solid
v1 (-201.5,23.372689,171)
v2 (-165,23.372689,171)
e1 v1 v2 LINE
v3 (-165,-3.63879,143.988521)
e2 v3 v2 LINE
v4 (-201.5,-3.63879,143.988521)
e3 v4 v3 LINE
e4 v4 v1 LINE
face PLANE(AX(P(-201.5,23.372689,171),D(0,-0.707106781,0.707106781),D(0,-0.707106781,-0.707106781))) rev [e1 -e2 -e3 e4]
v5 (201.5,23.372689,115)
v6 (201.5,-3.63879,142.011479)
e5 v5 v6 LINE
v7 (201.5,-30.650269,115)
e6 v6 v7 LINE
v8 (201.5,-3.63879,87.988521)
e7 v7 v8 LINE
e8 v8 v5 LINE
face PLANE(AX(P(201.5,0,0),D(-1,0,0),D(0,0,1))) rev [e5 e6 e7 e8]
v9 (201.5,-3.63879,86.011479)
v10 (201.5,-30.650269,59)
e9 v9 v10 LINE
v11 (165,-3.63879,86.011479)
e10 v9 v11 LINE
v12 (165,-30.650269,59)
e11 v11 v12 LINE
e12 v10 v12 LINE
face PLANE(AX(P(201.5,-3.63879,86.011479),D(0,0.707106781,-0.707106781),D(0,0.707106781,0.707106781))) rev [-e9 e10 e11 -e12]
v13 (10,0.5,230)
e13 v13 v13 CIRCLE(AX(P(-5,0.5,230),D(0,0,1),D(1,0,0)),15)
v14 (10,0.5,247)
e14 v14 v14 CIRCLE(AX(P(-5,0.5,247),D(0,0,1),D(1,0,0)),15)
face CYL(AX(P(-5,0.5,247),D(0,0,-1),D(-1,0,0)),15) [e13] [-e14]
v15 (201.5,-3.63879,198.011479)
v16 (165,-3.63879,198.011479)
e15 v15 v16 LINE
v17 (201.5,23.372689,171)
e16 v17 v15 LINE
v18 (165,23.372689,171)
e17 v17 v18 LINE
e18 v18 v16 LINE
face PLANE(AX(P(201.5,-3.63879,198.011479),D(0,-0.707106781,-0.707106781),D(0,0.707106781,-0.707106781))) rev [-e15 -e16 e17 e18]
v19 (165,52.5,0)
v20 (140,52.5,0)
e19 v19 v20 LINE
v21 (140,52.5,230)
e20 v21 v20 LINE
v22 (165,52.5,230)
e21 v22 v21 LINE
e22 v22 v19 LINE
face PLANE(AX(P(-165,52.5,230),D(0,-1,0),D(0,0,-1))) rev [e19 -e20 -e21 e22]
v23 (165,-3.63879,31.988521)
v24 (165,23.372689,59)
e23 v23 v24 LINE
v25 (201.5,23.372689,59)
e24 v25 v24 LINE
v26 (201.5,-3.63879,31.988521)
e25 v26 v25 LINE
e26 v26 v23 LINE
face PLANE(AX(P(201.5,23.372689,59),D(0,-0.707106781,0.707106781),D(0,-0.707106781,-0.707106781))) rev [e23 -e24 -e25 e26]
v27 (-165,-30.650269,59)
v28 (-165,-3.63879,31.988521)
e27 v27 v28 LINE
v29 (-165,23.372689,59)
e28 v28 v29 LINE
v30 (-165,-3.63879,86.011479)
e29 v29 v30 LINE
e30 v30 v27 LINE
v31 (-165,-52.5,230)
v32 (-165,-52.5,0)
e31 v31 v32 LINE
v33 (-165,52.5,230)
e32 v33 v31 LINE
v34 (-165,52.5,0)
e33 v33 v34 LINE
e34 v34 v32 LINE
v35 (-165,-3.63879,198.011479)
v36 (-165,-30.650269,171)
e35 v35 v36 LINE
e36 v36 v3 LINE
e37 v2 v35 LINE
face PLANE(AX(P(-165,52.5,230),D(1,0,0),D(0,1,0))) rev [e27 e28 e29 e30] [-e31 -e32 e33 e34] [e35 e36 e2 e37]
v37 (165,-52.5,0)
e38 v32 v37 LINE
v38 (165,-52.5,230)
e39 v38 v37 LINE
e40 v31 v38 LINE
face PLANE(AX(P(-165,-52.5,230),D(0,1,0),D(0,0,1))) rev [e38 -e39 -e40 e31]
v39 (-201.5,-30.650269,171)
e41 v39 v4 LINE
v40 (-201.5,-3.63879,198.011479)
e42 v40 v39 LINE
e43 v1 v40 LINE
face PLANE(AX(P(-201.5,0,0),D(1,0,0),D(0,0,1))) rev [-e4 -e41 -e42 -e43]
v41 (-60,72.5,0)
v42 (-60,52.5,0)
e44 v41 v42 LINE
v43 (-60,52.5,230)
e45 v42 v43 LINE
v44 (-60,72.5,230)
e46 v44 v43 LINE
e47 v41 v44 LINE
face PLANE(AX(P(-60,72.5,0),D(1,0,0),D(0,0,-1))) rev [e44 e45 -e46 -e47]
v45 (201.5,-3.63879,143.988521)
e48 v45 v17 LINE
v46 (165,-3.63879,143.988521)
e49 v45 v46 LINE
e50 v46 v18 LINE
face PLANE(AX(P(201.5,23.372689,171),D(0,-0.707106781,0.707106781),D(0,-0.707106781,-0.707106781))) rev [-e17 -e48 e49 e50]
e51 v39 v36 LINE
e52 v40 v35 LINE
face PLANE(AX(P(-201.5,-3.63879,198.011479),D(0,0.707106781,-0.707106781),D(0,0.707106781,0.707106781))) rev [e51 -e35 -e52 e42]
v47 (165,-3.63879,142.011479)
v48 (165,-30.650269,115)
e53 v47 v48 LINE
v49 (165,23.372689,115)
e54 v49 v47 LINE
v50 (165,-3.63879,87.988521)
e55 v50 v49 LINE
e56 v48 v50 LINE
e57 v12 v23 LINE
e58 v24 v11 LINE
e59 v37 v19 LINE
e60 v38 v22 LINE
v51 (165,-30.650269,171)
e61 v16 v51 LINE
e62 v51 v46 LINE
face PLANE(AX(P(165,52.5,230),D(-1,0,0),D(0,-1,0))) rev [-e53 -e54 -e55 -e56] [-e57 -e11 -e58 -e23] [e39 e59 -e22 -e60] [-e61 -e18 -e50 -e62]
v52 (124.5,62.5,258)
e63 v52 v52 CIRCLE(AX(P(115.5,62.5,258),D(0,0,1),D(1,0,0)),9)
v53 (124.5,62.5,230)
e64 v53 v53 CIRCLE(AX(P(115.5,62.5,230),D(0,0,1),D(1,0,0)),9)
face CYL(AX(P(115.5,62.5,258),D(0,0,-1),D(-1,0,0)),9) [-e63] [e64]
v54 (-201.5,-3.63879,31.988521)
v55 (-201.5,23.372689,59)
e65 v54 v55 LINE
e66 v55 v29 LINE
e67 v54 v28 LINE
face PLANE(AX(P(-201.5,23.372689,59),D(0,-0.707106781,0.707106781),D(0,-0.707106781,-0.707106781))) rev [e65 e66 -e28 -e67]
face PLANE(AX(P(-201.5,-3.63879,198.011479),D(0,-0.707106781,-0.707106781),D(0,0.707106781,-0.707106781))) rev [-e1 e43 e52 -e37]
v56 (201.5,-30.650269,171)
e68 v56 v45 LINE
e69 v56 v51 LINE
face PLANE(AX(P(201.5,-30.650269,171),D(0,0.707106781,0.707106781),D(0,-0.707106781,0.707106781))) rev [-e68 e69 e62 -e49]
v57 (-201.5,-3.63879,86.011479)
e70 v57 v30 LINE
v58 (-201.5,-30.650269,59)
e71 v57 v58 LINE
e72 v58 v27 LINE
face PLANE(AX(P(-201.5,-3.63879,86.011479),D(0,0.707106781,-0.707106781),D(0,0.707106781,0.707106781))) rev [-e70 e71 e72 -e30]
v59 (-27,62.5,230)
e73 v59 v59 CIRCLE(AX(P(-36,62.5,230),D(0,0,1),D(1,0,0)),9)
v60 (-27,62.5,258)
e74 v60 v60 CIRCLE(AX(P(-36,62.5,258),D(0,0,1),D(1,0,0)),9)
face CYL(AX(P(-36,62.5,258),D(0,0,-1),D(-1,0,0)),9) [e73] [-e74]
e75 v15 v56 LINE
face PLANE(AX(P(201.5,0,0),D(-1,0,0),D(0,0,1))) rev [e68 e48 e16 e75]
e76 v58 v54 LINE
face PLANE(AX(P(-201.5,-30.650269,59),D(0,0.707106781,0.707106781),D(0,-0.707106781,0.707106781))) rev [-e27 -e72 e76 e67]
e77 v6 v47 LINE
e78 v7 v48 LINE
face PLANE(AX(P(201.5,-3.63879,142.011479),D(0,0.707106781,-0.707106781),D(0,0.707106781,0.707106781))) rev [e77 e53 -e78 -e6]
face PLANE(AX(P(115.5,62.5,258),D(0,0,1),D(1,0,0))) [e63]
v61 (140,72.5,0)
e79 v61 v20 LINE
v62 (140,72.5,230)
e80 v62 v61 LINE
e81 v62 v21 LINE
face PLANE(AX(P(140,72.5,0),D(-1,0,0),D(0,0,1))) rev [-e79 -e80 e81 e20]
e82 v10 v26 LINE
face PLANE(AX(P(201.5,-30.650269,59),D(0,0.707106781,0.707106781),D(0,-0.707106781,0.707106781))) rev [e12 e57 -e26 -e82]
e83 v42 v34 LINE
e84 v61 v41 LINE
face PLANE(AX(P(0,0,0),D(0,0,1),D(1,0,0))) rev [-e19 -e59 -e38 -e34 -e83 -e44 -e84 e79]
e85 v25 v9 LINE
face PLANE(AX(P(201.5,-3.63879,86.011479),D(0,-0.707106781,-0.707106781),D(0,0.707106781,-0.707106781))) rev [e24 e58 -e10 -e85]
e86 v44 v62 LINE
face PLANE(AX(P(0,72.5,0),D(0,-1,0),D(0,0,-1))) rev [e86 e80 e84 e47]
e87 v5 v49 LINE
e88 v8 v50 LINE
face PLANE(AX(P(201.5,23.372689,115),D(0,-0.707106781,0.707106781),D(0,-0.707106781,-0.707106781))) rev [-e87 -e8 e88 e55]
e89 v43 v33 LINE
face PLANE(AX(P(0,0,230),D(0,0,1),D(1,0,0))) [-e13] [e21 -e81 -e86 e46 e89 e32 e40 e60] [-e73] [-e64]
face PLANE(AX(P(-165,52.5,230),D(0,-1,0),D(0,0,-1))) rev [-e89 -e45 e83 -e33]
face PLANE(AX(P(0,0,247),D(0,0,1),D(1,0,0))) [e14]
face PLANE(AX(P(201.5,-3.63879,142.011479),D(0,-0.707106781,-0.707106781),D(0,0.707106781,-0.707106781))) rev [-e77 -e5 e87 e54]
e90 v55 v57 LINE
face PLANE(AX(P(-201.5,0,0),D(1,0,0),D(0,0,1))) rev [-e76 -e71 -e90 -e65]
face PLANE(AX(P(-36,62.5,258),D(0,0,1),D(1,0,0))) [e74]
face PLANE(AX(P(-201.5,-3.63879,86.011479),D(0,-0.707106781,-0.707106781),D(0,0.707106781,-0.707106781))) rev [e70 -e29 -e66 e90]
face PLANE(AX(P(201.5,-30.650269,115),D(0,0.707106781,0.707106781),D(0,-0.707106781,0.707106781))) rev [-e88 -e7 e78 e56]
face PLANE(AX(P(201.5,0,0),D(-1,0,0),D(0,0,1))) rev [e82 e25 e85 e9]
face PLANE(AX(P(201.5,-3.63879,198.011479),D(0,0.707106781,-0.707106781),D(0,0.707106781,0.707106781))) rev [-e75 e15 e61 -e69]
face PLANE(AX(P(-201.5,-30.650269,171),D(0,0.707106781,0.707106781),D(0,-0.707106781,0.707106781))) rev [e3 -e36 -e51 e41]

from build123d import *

# Parameters (mm, degrees)
SKETCH1_W           = 330
SKETCH1_H           = 105
BOSS_EXTRUDE1_DEPTH = 230
SKETCH2_W           = 200
SKETCH2_H           = 230
BOSS_EXTRUDE2_DEPTH = 20
SKETCH5_R           = 9
BOSS_EXTRUDE4_DEPTH = 28
SKETCH5_5_R         = 15
BOSS_EXTRUDE5_DEPTH = 17
BOSS_EXTRUDE6_DEPTH = 36.5
MIRROR1_START       = 20.04628694
MIRROR1_OUTLINE_W   = 36.5
MIRROR1_OUTLINE_H   = 38.2
MIRROR1_DEPTH       = 38.2
MIRROR1_START_2     = 99.242246433
MIRROR1_2_OUTLINE_W = 36.5
MIRROR1_2_OUTLINE_H = 38.2
MIRROR1_2_DEPTH     = 38.2


# Read off the part's stored shape, not the designer's step: Mirror1
with BuildPart() as part:
    # Sketch1 → Boss-Extrude1 (new body)
    with BuildSketch(Plane.XY):
        Rectangle(SKETCH1_W, SKETCH1_H)
    extrude(amount=BOSS_EXTRUDE1_DEPTH)

    # Sketch2 → Boss-Extrude2 (add)
    with BuildSketch(Plane(origin=(0, 52.5, 0), x_dir=(1, 0, 0), z_dir=(0, 1, 0))):
        with Locations((40, -115)):
            Rectangle(SKETCH2_W, SKETCH2_H)
    extrude(amount=BOSS_EXTRUDE2_DEPTH)

    # Sketch5 → Boss-Extrude4 (add)
    with BuildSketch(Plane.XY.offset(230)):
        with Locations((115.5, 62.5)):
            Circle(SKETCH5_R)
        with Locations((-36, 62.5)):
            Circle(SKETCH5_R)
    extrude(amount=BOSS_EXTRUDE4_DEPTH)

    # Sketch5<5> → Boss-Extrude5 (add)
    with BuildSketch(Plane.XY.offset(230)):
        with Locations((-5, 0.5)):
            Circle(SKETCH5_5_R)
    extrude(amount=BOSS_EXTRUDE5_DEPTH)

    # Sketch6 → Boss-Extrude6 (add)
    with BuildSketch(Plane(origin=(165, 0, 0), x_dir=(0, 0, -1), z_dir=(1, 0, 0))):
        Polygon((-86.011479041, -3.638790093), (-59, -30.650269134), (-31.988520959, -3.638790093), (-59, 23.372688948), align=None)
        Polygon((-142.011479041, -3.638790093), (-115, -30.650269134), (-87.988520959, -3.638790093), (-115, 23.372688948), align=None)
        Polygon((-198.011479041, -3.638790093), (-171, -30.650269134), (-143.988520959, -3.638790093), (-171, 23.372688948), align=None)
    extrude(amount=BOSS_EXTRUDE6_DEPTH)

    # Mirror1 outline → Mirror1 (add)
    with BuildSketch(Plane(origin=(0, 0, 0), x_dir=(1, 0, 0), z_dir=(0, 0.707106781186546, 0.707106781186549)).offset(MIRROR1_START)):
        with Locations((-183.25, -44.29231324)):
            Rectangle(MIRROR1_OUTLINE_W, MIRROR1_OUTLINE_H)
    extrude(amount=MIRROR1_DEPTH)

    # Mirror1 2 outline → Mirror1 2 (add)
    with BuildSketch(Plane(origin=(0, 0, 0), x_dir=(1, 0, 0), z_dir=(0, 0.707106781186546, 0.707106781186549)).offset(MIRROR1_START_2)):
        with Locations((-183.25, -123.488272733)):
            Rectangle(MIRROR1_2_OUTLINE_W, MIRROR1_2_OUTLINE_H)
    extrude(amount=MIRROR1_2_DEPTH)


solid = part.part
